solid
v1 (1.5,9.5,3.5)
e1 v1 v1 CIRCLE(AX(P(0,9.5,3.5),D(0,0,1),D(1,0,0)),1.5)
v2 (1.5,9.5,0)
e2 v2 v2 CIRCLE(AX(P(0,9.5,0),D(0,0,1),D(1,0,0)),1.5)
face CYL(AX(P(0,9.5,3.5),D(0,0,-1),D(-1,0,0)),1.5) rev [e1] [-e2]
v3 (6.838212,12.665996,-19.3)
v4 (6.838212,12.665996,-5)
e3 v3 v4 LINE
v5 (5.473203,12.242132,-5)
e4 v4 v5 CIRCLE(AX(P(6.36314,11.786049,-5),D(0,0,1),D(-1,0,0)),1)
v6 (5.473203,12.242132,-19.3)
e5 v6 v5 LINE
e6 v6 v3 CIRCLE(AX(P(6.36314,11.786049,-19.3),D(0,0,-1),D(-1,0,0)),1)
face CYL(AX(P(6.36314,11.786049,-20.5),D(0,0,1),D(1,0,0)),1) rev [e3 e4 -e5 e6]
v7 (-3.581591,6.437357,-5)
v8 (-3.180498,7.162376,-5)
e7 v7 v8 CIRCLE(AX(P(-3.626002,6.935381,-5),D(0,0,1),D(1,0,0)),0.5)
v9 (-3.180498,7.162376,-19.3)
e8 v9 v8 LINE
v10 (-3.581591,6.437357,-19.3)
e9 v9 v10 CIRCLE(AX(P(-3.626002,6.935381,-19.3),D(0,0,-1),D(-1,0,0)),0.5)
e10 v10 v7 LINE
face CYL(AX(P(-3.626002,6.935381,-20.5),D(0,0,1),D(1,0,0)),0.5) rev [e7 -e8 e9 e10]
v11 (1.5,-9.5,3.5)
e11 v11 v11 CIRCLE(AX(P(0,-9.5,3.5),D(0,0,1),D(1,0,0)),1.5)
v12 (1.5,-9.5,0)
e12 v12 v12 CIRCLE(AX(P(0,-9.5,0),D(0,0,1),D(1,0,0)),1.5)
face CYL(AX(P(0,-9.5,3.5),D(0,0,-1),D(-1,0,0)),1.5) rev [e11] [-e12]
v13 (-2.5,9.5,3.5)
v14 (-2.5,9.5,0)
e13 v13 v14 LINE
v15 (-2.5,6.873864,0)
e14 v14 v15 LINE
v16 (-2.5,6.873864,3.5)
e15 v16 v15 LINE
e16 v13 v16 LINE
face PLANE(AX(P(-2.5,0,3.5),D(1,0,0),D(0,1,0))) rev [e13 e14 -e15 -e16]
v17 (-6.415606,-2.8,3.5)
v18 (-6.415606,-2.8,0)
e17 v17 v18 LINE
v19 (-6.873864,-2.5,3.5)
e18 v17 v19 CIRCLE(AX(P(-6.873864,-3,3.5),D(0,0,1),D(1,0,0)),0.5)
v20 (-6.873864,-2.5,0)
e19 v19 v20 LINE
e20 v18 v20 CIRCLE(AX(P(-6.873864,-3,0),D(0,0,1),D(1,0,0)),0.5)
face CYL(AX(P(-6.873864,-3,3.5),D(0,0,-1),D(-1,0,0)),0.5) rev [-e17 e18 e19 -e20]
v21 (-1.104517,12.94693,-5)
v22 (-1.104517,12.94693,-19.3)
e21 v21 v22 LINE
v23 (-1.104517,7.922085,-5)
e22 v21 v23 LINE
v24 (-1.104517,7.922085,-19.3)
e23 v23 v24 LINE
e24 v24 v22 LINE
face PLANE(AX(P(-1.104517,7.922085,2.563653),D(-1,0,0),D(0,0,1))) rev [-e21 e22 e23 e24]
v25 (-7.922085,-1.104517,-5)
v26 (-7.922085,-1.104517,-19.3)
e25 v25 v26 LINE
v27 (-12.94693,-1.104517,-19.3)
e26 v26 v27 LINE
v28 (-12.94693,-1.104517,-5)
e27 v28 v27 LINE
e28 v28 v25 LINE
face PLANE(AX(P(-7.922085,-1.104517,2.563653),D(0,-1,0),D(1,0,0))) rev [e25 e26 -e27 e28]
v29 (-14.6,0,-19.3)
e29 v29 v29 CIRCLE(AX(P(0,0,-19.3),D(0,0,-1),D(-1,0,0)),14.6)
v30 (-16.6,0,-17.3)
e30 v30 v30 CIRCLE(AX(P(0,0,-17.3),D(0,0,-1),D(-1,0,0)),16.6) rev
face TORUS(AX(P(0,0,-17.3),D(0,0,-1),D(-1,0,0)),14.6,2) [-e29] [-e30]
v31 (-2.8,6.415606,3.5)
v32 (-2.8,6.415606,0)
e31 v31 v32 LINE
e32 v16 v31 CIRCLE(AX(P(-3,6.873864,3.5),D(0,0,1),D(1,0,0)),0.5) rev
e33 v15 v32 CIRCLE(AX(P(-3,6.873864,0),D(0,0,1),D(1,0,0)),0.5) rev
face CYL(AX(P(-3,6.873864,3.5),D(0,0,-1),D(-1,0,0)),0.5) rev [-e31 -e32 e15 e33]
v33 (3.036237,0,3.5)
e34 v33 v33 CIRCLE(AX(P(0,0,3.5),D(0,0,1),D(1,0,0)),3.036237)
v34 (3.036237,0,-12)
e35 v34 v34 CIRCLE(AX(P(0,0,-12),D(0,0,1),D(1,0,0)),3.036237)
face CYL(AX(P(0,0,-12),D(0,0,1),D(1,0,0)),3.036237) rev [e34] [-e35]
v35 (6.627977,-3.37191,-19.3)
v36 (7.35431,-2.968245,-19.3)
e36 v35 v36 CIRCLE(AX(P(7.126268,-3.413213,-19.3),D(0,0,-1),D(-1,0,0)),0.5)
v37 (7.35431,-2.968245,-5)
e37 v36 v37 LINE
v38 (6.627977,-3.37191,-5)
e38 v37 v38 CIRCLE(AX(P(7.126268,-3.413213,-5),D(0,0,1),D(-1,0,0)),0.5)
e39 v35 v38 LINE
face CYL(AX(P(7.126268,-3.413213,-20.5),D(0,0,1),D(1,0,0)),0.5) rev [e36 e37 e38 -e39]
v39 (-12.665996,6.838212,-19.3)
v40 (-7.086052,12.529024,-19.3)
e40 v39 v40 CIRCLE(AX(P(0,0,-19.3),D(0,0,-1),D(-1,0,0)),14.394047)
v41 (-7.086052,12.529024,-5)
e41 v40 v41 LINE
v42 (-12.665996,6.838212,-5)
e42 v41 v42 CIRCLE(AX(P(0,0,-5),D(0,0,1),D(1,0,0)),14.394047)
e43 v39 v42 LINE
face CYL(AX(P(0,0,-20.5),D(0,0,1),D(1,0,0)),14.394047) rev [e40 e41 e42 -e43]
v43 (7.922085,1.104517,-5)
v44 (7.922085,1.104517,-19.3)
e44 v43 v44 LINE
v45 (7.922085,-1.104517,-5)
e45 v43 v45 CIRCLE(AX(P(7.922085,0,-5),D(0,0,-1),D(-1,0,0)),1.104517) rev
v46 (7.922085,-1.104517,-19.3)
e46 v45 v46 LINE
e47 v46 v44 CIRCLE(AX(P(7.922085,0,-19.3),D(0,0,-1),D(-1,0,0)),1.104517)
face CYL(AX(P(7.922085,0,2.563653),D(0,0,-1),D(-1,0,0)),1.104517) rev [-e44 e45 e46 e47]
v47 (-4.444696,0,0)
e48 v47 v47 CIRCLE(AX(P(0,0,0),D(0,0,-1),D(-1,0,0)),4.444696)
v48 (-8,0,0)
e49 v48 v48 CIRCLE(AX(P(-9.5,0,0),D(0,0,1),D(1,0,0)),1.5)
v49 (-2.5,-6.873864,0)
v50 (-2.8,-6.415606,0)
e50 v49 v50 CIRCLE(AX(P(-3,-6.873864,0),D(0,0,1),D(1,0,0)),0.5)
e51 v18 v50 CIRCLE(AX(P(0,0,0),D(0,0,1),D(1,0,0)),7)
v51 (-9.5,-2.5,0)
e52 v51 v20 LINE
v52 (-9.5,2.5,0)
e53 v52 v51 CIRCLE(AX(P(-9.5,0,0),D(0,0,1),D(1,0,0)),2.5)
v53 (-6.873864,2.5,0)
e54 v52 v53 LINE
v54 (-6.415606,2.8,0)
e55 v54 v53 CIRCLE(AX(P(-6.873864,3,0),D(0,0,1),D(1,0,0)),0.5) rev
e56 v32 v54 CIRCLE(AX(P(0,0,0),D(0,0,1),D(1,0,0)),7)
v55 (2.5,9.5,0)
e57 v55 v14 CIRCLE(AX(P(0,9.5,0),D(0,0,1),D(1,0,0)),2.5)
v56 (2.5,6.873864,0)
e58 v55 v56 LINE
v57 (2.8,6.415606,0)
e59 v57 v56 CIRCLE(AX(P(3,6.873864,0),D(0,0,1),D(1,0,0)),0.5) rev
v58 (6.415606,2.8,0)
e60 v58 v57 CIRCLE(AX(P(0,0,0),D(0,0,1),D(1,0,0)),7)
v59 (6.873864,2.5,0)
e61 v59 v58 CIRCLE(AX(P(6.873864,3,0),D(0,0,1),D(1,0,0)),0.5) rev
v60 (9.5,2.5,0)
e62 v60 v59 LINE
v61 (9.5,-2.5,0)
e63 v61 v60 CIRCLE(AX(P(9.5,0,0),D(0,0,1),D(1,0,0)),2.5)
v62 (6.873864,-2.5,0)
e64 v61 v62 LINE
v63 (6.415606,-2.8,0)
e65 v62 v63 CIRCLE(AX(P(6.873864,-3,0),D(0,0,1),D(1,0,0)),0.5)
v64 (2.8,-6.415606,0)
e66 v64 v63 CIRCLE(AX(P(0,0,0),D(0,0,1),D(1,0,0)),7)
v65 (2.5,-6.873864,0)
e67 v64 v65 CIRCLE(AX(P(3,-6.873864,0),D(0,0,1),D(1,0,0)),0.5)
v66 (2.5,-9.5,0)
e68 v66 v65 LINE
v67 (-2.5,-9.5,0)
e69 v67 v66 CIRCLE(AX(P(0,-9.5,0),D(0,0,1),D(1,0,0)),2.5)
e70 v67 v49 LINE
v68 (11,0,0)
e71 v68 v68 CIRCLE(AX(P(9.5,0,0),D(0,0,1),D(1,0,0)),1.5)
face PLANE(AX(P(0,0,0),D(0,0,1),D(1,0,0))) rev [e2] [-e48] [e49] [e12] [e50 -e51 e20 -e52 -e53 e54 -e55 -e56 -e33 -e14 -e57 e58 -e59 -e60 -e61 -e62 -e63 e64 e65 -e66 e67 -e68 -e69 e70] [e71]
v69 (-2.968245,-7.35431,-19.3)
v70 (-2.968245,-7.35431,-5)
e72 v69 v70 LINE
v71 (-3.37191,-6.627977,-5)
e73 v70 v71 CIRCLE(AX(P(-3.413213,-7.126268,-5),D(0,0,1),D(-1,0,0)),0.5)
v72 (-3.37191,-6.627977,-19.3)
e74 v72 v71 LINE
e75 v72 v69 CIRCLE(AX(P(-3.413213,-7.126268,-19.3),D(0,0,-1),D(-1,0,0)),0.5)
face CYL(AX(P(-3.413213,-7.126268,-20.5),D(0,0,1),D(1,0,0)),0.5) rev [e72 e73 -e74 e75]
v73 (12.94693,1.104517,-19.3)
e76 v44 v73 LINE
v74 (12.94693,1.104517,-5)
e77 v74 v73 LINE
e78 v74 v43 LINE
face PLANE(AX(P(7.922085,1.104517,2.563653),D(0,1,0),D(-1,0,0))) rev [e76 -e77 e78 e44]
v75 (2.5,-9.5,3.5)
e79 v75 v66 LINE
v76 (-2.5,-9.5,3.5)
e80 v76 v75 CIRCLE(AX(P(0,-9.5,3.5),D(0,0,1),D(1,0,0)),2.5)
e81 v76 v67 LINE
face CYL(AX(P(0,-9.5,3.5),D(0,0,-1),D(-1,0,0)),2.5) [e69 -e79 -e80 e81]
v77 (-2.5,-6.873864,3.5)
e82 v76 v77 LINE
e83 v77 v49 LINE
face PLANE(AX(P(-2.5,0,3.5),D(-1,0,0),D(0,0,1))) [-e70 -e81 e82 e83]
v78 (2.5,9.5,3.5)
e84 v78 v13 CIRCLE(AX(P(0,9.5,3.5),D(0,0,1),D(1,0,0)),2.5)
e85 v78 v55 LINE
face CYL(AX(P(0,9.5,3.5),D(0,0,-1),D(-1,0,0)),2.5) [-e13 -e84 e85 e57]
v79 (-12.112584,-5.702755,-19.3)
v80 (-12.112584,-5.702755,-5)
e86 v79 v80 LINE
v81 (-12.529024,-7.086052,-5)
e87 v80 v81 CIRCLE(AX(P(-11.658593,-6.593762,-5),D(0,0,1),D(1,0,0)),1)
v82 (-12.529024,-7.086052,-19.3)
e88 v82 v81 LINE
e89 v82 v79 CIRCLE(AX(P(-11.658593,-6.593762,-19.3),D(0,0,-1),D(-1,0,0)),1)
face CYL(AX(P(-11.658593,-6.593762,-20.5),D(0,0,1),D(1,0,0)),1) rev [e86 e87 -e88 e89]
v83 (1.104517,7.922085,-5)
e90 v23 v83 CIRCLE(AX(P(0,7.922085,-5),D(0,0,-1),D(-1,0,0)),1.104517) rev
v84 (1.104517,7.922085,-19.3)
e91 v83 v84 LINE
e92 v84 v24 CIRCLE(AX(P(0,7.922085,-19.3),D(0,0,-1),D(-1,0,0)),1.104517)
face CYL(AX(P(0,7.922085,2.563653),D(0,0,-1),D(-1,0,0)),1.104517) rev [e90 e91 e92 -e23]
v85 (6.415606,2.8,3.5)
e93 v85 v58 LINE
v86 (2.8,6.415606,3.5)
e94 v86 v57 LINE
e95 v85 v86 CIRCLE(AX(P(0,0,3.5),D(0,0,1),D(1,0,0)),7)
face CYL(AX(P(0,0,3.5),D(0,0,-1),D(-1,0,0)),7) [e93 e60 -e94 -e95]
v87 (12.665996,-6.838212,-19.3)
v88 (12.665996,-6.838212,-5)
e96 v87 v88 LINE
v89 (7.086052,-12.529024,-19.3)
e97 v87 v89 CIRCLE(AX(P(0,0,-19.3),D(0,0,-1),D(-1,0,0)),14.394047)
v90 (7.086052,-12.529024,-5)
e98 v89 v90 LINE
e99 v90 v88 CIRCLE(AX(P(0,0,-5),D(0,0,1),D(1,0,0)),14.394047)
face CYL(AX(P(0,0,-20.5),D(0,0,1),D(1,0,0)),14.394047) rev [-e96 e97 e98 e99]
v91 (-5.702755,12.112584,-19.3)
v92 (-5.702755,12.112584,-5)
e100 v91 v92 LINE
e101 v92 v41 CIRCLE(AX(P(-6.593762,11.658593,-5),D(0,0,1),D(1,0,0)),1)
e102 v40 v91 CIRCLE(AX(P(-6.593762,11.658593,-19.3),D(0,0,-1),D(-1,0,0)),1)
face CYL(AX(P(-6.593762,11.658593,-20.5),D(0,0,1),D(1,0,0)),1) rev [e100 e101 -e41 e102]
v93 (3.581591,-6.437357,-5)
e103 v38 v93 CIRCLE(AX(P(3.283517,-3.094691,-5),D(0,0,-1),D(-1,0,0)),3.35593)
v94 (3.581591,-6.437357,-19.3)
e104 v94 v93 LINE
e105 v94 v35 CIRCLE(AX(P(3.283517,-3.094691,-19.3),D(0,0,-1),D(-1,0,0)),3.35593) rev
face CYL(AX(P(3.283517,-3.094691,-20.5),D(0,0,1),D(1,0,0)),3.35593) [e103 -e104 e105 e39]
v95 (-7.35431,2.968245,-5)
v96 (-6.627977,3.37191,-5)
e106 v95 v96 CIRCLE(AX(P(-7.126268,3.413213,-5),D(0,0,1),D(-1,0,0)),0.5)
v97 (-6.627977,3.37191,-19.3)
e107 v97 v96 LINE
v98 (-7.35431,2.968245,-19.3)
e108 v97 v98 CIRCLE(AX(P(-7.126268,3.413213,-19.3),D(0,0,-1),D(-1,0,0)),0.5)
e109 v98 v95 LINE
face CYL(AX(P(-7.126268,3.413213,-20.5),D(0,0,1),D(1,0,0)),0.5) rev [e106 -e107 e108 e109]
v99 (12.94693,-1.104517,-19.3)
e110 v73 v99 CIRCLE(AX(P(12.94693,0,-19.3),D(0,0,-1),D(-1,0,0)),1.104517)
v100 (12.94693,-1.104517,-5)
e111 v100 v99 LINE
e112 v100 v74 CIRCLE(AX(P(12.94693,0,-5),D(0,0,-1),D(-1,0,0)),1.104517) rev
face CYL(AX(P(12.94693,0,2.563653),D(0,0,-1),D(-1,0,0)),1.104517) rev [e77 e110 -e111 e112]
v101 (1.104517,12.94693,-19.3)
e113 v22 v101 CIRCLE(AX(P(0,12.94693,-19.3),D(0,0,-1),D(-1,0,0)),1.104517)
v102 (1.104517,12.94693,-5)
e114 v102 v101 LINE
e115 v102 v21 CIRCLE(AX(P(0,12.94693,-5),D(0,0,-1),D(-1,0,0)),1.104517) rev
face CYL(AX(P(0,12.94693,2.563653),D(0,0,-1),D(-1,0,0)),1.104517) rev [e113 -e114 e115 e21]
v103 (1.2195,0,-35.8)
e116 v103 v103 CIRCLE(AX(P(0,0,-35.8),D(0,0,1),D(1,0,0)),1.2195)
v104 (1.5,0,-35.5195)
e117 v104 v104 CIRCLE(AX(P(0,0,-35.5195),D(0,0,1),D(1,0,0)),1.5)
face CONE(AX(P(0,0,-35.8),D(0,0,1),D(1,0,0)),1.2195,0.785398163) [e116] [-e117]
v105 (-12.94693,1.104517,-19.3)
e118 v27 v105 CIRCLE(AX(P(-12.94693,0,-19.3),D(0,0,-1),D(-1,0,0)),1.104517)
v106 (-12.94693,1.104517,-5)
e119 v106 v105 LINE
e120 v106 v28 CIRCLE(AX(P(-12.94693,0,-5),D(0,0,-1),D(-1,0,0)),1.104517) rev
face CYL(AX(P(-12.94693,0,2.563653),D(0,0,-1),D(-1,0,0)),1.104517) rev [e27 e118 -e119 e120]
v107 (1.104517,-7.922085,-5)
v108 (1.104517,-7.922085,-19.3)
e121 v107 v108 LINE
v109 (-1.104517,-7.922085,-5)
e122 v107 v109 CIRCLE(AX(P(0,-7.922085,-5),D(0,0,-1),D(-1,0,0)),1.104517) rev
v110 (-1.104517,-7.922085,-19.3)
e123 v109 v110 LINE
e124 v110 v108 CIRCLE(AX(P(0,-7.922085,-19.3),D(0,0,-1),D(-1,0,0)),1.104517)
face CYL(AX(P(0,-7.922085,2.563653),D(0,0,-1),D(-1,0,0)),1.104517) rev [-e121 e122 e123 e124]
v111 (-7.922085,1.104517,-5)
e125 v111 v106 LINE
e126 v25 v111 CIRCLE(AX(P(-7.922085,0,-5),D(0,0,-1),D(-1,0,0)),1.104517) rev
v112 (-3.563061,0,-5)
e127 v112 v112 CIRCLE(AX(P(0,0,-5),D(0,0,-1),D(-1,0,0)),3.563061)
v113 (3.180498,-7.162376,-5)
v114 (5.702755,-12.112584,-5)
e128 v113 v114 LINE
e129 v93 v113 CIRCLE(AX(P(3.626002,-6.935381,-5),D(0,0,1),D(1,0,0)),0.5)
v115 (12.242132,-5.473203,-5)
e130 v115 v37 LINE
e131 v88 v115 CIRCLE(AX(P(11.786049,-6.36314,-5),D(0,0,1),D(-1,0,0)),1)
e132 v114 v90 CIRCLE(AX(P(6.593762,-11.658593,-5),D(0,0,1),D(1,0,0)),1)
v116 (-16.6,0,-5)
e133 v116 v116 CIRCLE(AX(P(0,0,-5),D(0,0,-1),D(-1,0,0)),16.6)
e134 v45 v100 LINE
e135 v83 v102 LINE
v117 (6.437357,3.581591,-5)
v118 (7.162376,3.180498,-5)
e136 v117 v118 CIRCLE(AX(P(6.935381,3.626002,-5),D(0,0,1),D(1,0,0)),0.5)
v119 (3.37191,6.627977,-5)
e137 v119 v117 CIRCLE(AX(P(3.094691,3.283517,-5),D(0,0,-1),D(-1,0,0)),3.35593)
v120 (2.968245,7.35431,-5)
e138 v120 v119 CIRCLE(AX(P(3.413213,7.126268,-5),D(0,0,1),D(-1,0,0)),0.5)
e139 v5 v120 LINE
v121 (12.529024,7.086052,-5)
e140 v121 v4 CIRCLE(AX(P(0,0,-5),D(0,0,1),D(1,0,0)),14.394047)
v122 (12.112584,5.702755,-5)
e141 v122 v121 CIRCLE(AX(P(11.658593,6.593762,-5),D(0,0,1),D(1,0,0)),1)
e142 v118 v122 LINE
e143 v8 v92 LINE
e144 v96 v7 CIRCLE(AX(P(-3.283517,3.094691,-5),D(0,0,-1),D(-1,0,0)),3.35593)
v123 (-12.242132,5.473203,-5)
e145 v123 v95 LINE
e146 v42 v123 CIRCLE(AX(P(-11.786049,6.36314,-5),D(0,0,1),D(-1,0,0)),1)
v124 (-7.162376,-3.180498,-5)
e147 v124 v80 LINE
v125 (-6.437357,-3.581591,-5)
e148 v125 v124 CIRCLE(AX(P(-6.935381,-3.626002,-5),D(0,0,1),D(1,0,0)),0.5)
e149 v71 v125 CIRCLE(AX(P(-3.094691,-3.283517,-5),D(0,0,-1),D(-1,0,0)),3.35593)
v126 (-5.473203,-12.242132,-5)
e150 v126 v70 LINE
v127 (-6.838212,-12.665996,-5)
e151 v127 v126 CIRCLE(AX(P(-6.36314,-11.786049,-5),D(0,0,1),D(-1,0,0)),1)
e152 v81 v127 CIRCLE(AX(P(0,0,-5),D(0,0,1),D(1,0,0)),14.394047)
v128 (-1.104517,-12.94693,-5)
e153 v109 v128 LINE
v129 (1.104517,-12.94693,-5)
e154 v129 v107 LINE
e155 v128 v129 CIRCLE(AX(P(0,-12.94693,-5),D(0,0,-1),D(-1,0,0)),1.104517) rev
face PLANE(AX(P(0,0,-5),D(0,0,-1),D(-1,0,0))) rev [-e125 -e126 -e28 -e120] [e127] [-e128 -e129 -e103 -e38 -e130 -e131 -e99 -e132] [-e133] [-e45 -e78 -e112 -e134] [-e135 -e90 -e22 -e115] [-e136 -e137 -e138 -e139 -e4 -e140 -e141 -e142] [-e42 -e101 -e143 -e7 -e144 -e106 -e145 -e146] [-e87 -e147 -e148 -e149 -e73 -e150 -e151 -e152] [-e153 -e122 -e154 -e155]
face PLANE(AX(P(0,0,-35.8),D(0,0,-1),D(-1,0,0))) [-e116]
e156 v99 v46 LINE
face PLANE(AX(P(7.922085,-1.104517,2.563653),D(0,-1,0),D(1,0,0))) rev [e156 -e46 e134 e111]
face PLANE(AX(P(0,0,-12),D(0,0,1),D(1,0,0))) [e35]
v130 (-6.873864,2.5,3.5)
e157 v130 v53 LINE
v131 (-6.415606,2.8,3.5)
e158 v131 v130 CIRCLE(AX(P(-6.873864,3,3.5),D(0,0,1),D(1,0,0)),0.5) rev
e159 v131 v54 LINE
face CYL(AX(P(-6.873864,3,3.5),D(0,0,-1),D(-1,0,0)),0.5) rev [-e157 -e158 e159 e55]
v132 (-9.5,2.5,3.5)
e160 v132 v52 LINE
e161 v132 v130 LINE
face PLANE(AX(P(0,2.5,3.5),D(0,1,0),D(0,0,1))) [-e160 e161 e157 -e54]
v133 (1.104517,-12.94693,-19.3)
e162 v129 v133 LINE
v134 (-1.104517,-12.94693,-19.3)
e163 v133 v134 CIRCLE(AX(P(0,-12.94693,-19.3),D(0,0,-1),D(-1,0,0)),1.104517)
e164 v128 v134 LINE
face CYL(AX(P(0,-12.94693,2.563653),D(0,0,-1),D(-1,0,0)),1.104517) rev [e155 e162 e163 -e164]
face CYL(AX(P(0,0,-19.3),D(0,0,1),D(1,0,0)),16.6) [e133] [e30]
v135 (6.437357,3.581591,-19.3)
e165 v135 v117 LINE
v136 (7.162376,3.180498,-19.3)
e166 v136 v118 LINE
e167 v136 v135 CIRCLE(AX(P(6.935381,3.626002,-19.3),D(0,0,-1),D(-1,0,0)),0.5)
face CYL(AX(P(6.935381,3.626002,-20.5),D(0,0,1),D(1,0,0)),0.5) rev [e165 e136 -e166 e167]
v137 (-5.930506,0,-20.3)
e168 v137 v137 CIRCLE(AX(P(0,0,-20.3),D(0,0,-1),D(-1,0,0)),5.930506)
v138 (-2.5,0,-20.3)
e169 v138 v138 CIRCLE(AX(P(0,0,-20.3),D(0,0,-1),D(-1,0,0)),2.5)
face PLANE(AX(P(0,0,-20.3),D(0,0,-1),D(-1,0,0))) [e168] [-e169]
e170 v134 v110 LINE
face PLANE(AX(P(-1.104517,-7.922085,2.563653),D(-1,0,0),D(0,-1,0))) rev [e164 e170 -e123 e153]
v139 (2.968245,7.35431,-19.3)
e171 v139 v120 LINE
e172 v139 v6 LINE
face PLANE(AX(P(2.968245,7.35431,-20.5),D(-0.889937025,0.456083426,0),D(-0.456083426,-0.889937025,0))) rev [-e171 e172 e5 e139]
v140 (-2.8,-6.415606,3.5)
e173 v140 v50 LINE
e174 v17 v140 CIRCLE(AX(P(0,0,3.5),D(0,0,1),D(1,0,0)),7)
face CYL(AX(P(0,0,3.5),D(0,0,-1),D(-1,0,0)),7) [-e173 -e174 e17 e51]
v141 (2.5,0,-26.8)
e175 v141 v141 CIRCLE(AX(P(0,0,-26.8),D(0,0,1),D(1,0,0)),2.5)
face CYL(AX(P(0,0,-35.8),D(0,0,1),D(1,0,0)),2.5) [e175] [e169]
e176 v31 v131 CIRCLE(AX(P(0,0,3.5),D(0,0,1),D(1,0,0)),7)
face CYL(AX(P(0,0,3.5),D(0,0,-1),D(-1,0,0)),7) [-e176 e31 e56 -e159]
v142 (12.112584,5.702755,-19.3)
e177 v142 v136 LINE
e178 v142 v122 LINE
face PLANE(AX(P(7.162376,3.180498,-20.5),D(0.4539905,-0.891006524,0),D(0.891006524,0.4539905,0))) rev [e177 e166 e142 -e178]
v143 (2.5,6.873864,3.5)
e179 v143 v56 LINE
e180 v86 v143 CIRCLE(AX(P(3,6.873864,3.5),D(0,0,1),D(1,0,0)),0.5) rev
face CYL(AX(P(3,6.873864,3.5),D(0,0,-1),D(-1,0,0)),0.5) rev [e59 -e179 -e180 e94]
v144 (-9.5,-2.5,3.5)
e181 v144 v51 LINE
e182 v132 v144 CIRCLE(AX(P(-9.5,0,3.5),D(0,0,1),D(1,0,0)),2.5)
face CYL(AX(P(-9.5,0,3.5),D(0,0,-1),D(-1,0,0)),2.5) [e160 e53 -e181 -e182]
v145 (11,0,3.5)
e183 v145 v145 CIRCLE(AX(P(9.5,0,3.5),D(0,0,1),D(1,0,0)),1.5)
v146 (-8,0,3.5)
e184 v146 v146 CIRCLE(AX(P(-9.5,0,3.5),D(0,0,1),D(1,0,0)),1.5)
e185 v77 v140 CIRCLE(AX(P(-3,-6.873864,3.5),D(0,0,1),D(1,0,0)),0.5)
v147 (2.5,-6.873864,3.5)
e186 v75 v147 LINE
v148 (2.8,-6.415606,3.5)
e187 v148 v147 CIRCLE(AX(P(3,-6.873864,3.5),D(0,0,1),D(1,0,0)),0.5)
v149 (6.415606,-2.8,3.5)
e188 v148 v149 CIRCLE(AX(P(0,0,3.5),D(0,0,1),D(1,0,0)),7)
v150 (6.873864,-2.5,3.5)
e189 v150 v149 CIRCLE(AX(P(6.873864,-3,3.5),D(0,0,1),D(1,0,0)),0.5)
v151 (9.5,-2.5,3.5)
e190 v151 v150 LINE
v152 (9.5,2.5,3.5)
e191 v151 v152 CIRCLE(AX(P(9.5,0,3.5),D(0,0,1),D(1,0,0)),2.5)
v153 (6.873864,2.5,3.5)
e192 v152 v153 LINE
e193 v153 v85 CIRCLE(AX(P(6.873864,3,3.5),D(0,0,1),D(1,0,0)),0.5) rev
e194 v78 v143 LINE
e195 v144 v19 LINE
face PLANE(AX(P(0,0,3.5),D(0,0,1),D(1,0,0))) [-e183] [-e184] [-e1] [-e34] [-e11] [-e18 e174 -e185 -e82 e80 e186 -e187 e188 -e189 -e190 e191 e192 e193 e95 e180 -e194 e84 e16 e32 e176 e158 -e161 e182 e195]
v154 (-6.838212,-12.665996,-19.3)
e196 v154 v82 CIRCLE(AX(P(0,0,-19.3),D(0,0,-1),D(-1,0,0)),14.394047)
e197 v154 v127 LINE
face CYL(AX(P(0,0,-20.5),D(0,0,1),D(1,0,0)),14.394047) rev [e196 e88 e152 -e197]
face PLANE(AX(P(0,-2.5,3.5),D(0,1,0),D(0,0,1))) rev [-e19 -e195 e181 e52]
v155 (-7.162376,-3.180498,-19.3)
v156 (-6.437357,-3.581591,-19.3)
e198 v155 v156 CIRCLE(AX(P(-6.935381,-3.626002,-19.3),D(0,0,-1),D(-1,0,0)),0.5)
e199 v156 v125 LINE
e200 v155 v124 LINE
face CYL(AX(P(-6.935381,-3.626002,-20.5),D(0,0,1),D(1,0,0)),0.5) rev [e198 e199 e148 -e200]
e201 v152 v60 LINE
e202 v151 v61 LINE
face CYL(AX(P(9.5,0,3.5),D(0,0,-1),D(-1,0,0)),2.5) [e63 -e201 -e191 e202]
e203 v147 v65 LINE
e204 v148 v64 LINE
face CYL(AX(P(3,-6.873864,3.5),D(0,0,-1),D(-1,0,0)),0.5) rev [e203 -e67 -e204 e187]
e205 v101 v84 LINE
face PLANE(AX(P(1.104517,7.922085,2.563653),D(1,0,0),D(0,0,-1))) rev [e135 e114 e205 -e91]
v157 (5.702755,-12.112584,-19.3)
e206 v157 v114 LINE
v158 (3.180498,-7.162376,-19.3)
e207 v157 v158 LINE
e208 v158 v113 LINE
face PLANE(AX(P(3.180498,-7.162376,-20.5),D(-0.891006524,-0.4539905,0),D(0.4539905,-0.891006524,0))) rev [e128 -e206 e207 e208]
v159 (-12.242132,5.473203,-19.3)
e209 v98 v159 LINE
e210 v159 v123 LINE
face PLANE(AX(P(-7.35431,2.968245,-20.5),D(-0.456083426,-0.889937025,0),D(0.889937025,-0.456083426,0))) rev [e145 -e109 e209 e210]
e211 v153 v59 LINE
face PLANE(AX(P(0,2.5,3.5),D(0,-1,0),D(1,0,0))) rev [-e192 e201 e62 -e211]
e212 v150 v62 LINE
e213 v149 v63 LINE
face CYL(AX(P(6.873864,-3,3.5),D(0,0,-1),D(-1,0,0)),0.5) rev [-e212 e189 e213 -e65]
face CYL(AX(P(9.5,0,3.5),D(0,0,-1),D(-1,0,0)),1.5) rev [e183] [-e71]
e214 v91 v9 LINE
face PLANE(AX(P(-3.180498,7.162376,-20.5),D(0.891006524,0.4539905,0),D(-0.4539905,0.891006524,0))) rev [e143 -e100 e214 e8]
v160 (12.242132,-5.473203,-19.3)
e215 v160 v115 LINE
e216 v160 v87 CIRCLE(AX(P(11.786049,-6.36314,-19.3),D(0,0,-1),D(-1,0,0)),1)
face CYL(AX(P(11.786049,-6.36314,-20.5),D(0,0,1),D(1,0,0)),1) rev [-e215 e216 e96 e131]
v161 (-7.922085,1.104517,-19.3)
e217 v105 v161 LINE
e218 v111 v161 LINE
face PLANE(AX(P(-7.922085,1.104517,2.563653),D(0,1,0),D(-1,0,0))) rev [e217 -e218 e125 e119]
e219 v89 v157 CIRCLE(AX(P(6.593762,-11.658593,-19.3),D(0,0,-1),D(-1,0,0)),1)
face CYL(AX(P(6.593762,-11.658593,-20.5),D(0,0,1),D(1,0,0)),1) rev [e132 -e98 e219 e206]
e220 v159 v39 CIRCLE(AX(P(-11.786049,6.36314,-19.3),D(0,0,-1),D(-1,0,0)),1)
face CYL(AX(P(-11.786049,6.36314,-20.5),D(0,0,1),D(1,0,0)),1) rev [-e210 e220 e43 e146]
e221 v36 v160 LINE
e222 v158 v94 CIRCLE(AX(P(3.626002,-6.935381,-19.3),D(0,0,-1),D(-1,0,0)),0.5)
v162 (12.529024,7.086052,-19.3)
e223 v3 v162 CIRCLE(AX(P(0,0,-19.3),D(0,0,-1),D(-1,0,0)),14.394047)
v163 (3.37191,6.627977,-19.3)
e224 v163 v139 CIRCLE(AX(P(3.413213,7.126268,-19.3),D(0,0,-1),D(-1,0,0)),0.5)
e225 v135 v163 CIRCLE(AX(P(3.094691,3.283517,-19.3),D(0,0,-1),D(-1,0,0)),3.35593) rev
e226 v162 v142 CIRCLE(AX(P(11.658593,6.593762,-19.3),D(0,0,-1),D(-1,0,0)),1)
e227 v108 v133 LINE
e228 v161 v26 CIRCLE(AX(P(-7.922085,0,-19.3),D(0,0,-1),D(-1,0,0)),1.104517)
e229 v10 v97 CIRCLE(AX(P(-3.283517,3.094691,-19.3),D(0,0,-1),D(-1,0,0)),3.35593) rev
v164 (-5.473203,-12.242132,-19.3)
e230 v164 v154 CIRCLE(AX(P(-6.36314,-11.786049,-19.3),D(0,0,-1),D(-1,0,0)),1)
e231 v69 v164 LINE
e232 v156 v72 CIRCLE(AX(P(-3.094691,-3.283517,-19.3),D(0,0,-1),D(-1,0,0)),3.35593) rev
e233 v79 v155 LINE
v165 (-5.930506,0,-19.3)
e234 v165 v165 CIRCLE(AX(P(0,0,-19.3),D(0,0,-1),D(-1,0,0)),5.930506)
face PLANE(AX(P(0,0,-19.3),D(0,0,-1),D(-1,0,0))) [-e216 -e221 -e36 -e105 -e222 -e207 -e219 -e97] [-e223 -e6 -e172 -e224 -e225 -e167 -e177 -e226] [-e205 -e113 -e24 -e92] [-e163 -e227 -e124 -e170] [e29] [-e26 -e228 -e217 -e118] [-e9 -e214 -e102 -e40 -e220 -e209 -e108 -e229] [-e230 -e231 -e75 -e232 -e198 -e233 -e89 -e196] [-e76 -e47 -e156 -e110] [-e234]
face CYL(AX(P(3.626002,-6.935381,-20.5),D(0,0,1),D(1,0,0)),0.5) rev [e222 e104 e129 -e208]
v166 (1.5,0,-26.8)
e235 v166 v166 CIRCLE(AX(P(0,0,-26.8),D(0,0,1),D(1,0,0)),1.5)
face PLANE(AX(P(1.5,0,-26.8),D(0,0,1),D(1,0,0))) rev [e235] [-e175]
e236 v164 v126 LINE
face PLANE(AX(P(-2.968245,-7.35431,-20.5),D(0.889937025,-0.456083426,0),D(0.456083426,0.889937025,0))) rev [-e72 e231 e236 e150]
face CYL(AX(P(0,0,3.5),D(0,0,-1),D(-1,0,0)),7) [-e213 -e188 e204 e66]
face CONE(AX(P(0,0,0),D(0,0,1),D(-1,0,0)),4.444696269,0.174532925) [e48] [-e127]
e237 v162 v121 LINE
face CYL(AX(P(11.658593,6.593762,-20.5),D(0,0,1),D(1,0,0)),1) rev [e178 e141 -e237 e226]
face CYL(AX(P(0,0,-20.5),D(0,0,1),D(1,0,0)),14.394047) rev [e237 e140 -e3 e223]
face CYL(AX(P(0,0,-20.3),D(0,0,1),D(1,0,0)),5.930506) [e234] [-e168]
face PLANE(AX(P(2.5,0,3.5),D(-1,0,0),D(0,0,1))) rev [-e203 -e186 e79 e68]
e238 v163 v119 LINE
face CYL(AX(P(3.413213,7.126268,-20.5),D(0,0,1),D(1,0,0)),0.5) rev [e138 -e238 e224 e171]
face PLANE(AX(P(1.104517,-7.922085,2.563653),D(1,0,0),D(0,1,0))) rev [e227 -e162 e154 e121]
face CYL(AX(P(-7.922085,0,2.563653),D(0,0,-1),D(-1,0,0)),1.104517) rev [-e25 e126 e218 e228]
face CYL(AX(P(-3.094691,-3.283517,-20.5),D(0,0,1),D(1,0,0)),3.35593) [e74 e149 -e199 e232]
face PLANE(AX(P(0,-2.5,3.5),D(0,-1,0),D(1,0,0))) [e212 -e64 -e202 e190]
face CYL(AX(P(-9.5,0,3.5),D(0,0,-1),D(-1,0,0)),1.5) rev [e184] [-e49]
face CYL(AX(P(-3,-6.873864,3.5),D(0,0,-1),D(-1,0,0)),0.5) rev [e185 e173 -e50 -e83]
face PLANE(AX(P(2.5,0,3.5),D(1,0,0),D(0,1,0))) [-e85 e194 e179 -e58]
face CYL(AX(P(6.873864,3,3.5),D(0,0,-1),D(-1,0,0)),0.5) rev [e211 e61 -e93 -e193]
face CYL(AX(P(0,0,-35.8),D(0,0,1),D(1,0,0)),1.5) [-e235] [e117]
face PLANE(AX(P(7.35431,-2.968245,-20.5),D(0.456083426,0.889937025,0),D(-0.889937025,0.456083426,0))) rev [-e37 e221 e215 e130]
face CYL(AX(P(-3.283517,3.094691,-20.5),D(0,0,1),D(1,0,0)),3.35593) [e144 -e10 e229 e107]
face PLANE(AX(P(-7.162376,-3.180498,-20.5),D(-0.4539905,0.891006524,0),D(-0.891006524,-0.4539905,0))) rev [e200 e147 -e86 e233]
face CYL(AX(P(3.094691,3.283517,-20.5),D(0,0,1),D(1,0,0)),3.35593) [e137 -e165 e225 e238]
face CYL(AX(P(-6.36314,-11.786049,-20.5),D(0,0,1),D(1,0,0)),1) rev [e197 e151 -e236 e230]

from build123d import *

# Parameters (mm, degrees)
IZIM1_R                     = 1.5
Y_KSEKLIK_EKSTR_ZYON1_DEPTH = 3.5
IZIM2_R                     = 4.444696269
Y_KSEKLIK_EKSTR_ZYON2_DEPTH = 5
Y_KSEKLIK_EKSTR_ZYON2_TAPER = 10
IZIM3_R                     = 16.6
Y_KSEKLIK_EKSTR_ZYON3_DEPTH = 14.3
IZIM4_R                     = 5.930506141
Y_KSEKLIK_EKSTR_ZYON4_DEPTH = 1
RADYUS1_R                   = 2
IZIM5_R                     = 2.5
Y_KSEKLIK_EKSTR_ZYON5_DEPTH = 15.5
IZIM7_R                     = 3.036237063
KES_EKSTR_ZYON1_DEPTH       = 15.5
KES_EKSTR_ZYON2_DEPTH       = 15.5
KES_EKSTR_ZYON3_DEPTH       = 14.3


# Read off the part's stored shape, not the designer's step: M3x0.5 Makine Dişleri Saplama1
with BuildPart() as part:
    # Çizim1 → Yükseklik-Ekstrüzyon1 (new body)
    with BuildSketch(Plane.XY):
        with BuildLine():
            Line((-6.873863542, 2.5), (-9.5, 2.5))
            ThreePointArc((-9.5, 2.5), (-12, 0), (-9.5, -2.5))
            Line((-9.5, -2.5), (-6.873863542, -2.5))
            ThreePointArc((-6.873863542, -2.5), (-6.600002264, -2.581669987), (-6.415605973, -2.8))
            ThreePointArc((-6.415605973, -2.8), (-4.949747468, -4.949747468), (-2.8, -6.415605973))
            ThreePointArc((-2.8, -6.415605973), (-2.581669987, -6.600002264), (-2.5, -6.873863542))
            Line((-2.5, -6.873863542), (-2.5, -9.5))
            ThreePointArc((-2.5, -9.5), (0, -12), (2.5, -9.5))
            Line((2.5, -9.5), (2.5, -6.873863542))
            ThreePointArc((2.5, -6.873863542), (2.581669987, -6.600002264), (2.8, -6.415605973))
            ThreePointArc((2.8, -6.415605973), (4.949747468, -4.949747468), (6.415605973, -2.8))
            ThreePointArc((6.415605973, -2.8), (6.600002264, -2.581669987), (6.873863542, -2.5))
            Line((6.873863542, -2.5), (9.5, -2.5))
            ThreePointArc((9.5, -2.5), (12, 0), (9.5, 2.5))
            Line((9.5, 2.5), (6.873863542, 2.5))
            ThreePointArc((6.873863542, 2.5), (6.600002264, 2.581669987), (6.415605973, 2.8))
            ThreePointArc((6.415605973, 2.8), (4.949747468, 4.949747468), (2.8, 6.415605973))
            ThreePointArc((2.8, 6.415605973), (2.581669987, 6.600002264), (2.5, 6.873863542))
            Line((2.5, 6.873863542), (2.5, 9.5))
            ThreePointArc((2.5, 9.5), (0, 12), (-2.5, 9.5))
            Line((-2.5, 9.5), (-2.5, 6.873863542))
            ThreePointArc((-2.5, 6.873863542), (-2.581669987, 6.600002264), (-2.8, 6.415605973))
            ThreePointArc((-2.8, 6.415605973), (-4.949747468, 4.949747468), (-6.415605973, 2.8))
            ThreePointArc((-6.415605973, 2.8), (-6.600002264, 2.581669987), (-6.873863542, 2.5))
        make_face()
        with Locations((0, -9.5)):
            Circle(IZIM1_R, mode=Mode.SUBTRACT)
        with Locations((9.5, 0)):
            Circle(IZIM1_R, mode=Mode.SUBTRACT)
        with Locations((-9.5, 0)):
            Circle(IZIM1_R, mode=Mode.SUBTRACT)
        with Locations((0, 9.5)):
            Circle(IZIM1_R, mode=Mode.SUBTRACT)
    extrude(amount=Y_KSEKLIK_EKSTR_ZYON1_DEPTH)

    # Çizim2 → Yükseklik-Ekstrüzyon2 (add)
    with BuildSketch(Plane(origin=(0, 0, 0), x_dir=(-1, 0, 0), z_dir=(0, 0, -1))):
        Circle(IZIM2_R)
    extrude(amount=Y_KSEKLIK_EKSTR_ZYON2_DEPTH, taper=Y_KSEKLIK_EKSTR_ZYON2_TAPER)

    # Çizim3 → Yükseklik-Ekstrüzyon3 (add)
    with BuildSketch(Plane(origin=(0, 0, -5), x_dir=(-1, 0, 0), z_dir=(0, 0, -1))):
        Circle(IZIM3_R)
    extrude(amount=Y_KSEKLIK_EKSTR_ZYON3_DEPTH)

    # Çizim4 → Yükseklik-Ekstrüzyon4 (add)
    with BuildSketch(Plane(origin=(0, 0, -19.3), x_dir=(-1, 0, 0), z_dir=(0, 0, -1))):
        Circle(IZIM4_R)
    extrude(amount=Y_KSEKLIK_EKSTR_ZYON4_DEPTH)

    # Radyus1
    radyus1_edges = [part.edges().sort_by_distance(p)[0] for p in [
        (16.6, 0, -19.3),
    ]]
    fillet(radyus1_edges, radius=RADYUS1_R)

    # Çizim5 → Yükseklik-Ekstrüzyon5 (add)
    with BuildSketch(Plane(origin=(0, 0, -20.3), x_dir=(-1, 0, 0), z_dir=(0, 0, -1))):
        Circle(IZIM5_R)
    extrude(amount=Y_KSEKLIK_EKSTR_ZYON5_DEPTH)

    # M3x0.5 Makine Dişleri Saplama1 outline → M3x0.5 Makine Dişleri Saplama1 (revolve, cut)
    with BuildSketch(Plane.XZ):
        Polygon((1.2195, -35.8), (2.5, -35.8), (2.5, -26.8), (1.5, -26.8), (1.5, -35.5195), align=None)
    revolve(axis=Axis((0, 0, 0), (0, 0, 1)), mode=Mode.SUBTRACT)

    # Çizim7 → Kes-Ekstrüzyon1 (cut)
    with BuildSketch(Plane.XY.offset(3.5)):
        Circle(IZIM7_R)
    extrude(amount=-KES_EKSTR_ZYON1_DEPTH, mode=Mode.SUBTRACT)

    # Çizim8 → Kes-Ekstrüzyon2 (cut)
    with BuildSketch(Plane.XY.offset(-5)):
        with BuildLine():
            Line((-7.354310006, 2.968244823), (-12.242132216, 5.473202633))
            ThreePointArc((-12.242132216, 5.473202633), (-12.741065417, 6.0665874), (-12.665995596, 6.838211883))
            ThreePointArc((-12.665995596, 6.838211883), (-10.277751926, 10.077519613), (-7.086052208, 12.529024315))
            ThreePointArc((-7.086052208, 12.529024315), (-6.305492258, 12.616142663), (-5.702755207, 12.112583838))
            Line((-5.702755207, 12.112583838), (-3.180498361, 7.162376053))
            ThreePointArc((-3.180498361, 7.162376053), (-3.188489381, 6.693341471), (-3.581591444, 6.437356972))
            ThreePointArc((-3.581591444, 6.437356972), (-5.663906626, 5.460279376), (-6.627977149, 3.371910354))
            ThreePointArc((-6.627977149, 3.371910354), (-6.883379112, 2.976172324), (-7.354310006, 2.968244823))
        make_face()
        with BuildLine():
            Line((2.968244823, 7.354310006), (5.473202633, 12.242132216))
            ThreePointArc((5.473202633, 12.242132216), (6.0665874, 12.741065417), (6.838211883, 12.665995596))
            ThreePointArc((6.838211883, 12.665995596), (10.077519613, 10.277751926), (12.529024315, 7.086052208))
            ThreePointArc((12.529024315, 7.086052208), (12.616142663, 6.305492258), (12.112583838, 5.702755207))
            Line((12.112583838, 5.702755207), (7.162376053, 3.180498361))
            ThreePointArc((7.162376053, 3.180498361), (6.693341471, 3.188489381), (6.437356972, 3.581591444))
            ThreePointArc((6.437356972, 3.581591444), (5.460279376, 5.663906626), (3.371910354, 6.627977149))
            ThreePointArc((3.371910354, 6.627977149), (2.976172324, 6.883379112), (2.968244823, 7.354310006))
        make_face()
        with BuildLine():
            Line((7.354310006, -2.968244823), (12.242132216, -5.473202633))
            ThreePointArc((12.242132216, -5.473202633), (12.741065417, -6.0665874), (12.665995596, -6.838211883))
            ThreePointArc((12.665995596, -6.838211883), (10.277751926, -10.077519613), (7.086052208, -12.529024315))
            ThreePointArc((7.086052208, -12.529024315), (6.305492258, -12.616142663), (5.702755207, -12.112583838))
            Line((5.702755207, -12.112583838), (3.180498361, -7.162376053))
            ThreePointArc((3.180498361, -7.162376053), (3.188489381, -6.693341471), (3.581591444, -6.437356972))
            ThreePointArc((3.581591444, -6.437356972), (5.663906626, -5.460279376), (6.627977149, -3.371910354))
            ThreePointArc((6.627977149, -3.371910354), (6.883379112, -2.976172324), (7.354310006, -2.968244823))
        make_face()
        with BuildLine():
            Line((-2.968244823, -7.354310006), (-5.473202633, -12.242132216))
            ThreePointArc((-5.473202633, -12.242132216), (-6.0665874, -12.741065417), (-6.838211883, -12.665995596))
            ThreePointArc((-6.838211883, -12.665995596), (-10.077519613, -10.277751926), (-12.529024315, -7.086052208))
            ThreePointArc((-12.529024315, -7.086052208), (-12.616142663, -6.305492258), (-12.112583838, -5.702755207))
            Line((-12.112583838, -5.702755207), (-7.162376053, -3.180498361))
            ThreePointArc((-7.162376053, -3.180498361), (-6.693341471, -3.188489381), (-6.437356972, -3.581591444))
            ThreePointArc((-6.437356972, -3.581591444), (-5.460279376, -5.663906626), (-3.371910354, -6.627977149))
            ThreePointArc((-3.371910354, -6.627977149), (-2.976172324, -6.883379112), (-2.968244823, -7.354310006))
        make_face()
    extrude(amount=-KES_EKSTR_ZYON2_DEPTH, mode=Mode.SUBTRACT)

    # Çizim9 → Kes-Ekstrüzyon3 (cut)
    with BuildSketch(Plane(origin=(0, 0, -19.3), x_dir=(-1, 0, 0), z_dir=(0, 0, -1))):
        with BuildLine():
            Line((-1.104517159, 7.922084558), (-1.104517159, 12.946929574))
            ThreePointArc((-1.104517159, 12.946929574), (0, 14.051446732), (1.104517159, 12.946929574))
            Line((1.104517159, 12.946929574), (1.104517159, 7.922084558))
            ThreePointArc((1.104517159, 7.922084558), (0, 6.8175674), (-1.104517159, 7.922084558))
        make_face()
        with BuildLine():
            Line((7.922084558, -1.104517159), (12.946929574, -1.104517159))
            ThreePointArc((12.946929574, -1.104517159), (14.051446732, 0), (12.946929574, 1.104517159))
            Line((12.946929574, 1.104517159), (7.922084558, 1.104517159))
            ThreePointArc((7.922084558, 1.104517159), (6.8175674, 0), (7.922084558, -1.104517159))
        make_face()
        with BuildLine():
            Line((-1.104517159, -7.922084558), (-1.104517159, -12.946929574))
            ThreePointArc((-1.104517159, -12.946929574), (0, -14.051446732), (1.104517159, -12.946929574))
            Line((1.104517159, -12.946929574), (1.104517159, -7.922084558))
            ThreePointArc((1.104517159, -7.922084558), (0, -6.8175674), (-1.104517159, -7.922084558))
        make_face()
        with BuildLine():
            Line((-7.922084558, 1.104517159), (-12.946929574, 1.104517159))
            ThreePointArc((-12.946929574, 1.104517159), (-14.051446732, 0), (-12.946929574, -1.104517159))
            Line((-12.946929574, -1.104517159), (-7.922084558, -1.104517159))
            ThreePointArc((-7.922084558, -1.104517159), (-6.8175674, 0), (-7.922084558, 1.104517159))
        make_face()
    extrude(amount=-KES_EKSTR_ZYON3_DEPTH, mode=Mode.SUBTRACT)


solid = part.part
